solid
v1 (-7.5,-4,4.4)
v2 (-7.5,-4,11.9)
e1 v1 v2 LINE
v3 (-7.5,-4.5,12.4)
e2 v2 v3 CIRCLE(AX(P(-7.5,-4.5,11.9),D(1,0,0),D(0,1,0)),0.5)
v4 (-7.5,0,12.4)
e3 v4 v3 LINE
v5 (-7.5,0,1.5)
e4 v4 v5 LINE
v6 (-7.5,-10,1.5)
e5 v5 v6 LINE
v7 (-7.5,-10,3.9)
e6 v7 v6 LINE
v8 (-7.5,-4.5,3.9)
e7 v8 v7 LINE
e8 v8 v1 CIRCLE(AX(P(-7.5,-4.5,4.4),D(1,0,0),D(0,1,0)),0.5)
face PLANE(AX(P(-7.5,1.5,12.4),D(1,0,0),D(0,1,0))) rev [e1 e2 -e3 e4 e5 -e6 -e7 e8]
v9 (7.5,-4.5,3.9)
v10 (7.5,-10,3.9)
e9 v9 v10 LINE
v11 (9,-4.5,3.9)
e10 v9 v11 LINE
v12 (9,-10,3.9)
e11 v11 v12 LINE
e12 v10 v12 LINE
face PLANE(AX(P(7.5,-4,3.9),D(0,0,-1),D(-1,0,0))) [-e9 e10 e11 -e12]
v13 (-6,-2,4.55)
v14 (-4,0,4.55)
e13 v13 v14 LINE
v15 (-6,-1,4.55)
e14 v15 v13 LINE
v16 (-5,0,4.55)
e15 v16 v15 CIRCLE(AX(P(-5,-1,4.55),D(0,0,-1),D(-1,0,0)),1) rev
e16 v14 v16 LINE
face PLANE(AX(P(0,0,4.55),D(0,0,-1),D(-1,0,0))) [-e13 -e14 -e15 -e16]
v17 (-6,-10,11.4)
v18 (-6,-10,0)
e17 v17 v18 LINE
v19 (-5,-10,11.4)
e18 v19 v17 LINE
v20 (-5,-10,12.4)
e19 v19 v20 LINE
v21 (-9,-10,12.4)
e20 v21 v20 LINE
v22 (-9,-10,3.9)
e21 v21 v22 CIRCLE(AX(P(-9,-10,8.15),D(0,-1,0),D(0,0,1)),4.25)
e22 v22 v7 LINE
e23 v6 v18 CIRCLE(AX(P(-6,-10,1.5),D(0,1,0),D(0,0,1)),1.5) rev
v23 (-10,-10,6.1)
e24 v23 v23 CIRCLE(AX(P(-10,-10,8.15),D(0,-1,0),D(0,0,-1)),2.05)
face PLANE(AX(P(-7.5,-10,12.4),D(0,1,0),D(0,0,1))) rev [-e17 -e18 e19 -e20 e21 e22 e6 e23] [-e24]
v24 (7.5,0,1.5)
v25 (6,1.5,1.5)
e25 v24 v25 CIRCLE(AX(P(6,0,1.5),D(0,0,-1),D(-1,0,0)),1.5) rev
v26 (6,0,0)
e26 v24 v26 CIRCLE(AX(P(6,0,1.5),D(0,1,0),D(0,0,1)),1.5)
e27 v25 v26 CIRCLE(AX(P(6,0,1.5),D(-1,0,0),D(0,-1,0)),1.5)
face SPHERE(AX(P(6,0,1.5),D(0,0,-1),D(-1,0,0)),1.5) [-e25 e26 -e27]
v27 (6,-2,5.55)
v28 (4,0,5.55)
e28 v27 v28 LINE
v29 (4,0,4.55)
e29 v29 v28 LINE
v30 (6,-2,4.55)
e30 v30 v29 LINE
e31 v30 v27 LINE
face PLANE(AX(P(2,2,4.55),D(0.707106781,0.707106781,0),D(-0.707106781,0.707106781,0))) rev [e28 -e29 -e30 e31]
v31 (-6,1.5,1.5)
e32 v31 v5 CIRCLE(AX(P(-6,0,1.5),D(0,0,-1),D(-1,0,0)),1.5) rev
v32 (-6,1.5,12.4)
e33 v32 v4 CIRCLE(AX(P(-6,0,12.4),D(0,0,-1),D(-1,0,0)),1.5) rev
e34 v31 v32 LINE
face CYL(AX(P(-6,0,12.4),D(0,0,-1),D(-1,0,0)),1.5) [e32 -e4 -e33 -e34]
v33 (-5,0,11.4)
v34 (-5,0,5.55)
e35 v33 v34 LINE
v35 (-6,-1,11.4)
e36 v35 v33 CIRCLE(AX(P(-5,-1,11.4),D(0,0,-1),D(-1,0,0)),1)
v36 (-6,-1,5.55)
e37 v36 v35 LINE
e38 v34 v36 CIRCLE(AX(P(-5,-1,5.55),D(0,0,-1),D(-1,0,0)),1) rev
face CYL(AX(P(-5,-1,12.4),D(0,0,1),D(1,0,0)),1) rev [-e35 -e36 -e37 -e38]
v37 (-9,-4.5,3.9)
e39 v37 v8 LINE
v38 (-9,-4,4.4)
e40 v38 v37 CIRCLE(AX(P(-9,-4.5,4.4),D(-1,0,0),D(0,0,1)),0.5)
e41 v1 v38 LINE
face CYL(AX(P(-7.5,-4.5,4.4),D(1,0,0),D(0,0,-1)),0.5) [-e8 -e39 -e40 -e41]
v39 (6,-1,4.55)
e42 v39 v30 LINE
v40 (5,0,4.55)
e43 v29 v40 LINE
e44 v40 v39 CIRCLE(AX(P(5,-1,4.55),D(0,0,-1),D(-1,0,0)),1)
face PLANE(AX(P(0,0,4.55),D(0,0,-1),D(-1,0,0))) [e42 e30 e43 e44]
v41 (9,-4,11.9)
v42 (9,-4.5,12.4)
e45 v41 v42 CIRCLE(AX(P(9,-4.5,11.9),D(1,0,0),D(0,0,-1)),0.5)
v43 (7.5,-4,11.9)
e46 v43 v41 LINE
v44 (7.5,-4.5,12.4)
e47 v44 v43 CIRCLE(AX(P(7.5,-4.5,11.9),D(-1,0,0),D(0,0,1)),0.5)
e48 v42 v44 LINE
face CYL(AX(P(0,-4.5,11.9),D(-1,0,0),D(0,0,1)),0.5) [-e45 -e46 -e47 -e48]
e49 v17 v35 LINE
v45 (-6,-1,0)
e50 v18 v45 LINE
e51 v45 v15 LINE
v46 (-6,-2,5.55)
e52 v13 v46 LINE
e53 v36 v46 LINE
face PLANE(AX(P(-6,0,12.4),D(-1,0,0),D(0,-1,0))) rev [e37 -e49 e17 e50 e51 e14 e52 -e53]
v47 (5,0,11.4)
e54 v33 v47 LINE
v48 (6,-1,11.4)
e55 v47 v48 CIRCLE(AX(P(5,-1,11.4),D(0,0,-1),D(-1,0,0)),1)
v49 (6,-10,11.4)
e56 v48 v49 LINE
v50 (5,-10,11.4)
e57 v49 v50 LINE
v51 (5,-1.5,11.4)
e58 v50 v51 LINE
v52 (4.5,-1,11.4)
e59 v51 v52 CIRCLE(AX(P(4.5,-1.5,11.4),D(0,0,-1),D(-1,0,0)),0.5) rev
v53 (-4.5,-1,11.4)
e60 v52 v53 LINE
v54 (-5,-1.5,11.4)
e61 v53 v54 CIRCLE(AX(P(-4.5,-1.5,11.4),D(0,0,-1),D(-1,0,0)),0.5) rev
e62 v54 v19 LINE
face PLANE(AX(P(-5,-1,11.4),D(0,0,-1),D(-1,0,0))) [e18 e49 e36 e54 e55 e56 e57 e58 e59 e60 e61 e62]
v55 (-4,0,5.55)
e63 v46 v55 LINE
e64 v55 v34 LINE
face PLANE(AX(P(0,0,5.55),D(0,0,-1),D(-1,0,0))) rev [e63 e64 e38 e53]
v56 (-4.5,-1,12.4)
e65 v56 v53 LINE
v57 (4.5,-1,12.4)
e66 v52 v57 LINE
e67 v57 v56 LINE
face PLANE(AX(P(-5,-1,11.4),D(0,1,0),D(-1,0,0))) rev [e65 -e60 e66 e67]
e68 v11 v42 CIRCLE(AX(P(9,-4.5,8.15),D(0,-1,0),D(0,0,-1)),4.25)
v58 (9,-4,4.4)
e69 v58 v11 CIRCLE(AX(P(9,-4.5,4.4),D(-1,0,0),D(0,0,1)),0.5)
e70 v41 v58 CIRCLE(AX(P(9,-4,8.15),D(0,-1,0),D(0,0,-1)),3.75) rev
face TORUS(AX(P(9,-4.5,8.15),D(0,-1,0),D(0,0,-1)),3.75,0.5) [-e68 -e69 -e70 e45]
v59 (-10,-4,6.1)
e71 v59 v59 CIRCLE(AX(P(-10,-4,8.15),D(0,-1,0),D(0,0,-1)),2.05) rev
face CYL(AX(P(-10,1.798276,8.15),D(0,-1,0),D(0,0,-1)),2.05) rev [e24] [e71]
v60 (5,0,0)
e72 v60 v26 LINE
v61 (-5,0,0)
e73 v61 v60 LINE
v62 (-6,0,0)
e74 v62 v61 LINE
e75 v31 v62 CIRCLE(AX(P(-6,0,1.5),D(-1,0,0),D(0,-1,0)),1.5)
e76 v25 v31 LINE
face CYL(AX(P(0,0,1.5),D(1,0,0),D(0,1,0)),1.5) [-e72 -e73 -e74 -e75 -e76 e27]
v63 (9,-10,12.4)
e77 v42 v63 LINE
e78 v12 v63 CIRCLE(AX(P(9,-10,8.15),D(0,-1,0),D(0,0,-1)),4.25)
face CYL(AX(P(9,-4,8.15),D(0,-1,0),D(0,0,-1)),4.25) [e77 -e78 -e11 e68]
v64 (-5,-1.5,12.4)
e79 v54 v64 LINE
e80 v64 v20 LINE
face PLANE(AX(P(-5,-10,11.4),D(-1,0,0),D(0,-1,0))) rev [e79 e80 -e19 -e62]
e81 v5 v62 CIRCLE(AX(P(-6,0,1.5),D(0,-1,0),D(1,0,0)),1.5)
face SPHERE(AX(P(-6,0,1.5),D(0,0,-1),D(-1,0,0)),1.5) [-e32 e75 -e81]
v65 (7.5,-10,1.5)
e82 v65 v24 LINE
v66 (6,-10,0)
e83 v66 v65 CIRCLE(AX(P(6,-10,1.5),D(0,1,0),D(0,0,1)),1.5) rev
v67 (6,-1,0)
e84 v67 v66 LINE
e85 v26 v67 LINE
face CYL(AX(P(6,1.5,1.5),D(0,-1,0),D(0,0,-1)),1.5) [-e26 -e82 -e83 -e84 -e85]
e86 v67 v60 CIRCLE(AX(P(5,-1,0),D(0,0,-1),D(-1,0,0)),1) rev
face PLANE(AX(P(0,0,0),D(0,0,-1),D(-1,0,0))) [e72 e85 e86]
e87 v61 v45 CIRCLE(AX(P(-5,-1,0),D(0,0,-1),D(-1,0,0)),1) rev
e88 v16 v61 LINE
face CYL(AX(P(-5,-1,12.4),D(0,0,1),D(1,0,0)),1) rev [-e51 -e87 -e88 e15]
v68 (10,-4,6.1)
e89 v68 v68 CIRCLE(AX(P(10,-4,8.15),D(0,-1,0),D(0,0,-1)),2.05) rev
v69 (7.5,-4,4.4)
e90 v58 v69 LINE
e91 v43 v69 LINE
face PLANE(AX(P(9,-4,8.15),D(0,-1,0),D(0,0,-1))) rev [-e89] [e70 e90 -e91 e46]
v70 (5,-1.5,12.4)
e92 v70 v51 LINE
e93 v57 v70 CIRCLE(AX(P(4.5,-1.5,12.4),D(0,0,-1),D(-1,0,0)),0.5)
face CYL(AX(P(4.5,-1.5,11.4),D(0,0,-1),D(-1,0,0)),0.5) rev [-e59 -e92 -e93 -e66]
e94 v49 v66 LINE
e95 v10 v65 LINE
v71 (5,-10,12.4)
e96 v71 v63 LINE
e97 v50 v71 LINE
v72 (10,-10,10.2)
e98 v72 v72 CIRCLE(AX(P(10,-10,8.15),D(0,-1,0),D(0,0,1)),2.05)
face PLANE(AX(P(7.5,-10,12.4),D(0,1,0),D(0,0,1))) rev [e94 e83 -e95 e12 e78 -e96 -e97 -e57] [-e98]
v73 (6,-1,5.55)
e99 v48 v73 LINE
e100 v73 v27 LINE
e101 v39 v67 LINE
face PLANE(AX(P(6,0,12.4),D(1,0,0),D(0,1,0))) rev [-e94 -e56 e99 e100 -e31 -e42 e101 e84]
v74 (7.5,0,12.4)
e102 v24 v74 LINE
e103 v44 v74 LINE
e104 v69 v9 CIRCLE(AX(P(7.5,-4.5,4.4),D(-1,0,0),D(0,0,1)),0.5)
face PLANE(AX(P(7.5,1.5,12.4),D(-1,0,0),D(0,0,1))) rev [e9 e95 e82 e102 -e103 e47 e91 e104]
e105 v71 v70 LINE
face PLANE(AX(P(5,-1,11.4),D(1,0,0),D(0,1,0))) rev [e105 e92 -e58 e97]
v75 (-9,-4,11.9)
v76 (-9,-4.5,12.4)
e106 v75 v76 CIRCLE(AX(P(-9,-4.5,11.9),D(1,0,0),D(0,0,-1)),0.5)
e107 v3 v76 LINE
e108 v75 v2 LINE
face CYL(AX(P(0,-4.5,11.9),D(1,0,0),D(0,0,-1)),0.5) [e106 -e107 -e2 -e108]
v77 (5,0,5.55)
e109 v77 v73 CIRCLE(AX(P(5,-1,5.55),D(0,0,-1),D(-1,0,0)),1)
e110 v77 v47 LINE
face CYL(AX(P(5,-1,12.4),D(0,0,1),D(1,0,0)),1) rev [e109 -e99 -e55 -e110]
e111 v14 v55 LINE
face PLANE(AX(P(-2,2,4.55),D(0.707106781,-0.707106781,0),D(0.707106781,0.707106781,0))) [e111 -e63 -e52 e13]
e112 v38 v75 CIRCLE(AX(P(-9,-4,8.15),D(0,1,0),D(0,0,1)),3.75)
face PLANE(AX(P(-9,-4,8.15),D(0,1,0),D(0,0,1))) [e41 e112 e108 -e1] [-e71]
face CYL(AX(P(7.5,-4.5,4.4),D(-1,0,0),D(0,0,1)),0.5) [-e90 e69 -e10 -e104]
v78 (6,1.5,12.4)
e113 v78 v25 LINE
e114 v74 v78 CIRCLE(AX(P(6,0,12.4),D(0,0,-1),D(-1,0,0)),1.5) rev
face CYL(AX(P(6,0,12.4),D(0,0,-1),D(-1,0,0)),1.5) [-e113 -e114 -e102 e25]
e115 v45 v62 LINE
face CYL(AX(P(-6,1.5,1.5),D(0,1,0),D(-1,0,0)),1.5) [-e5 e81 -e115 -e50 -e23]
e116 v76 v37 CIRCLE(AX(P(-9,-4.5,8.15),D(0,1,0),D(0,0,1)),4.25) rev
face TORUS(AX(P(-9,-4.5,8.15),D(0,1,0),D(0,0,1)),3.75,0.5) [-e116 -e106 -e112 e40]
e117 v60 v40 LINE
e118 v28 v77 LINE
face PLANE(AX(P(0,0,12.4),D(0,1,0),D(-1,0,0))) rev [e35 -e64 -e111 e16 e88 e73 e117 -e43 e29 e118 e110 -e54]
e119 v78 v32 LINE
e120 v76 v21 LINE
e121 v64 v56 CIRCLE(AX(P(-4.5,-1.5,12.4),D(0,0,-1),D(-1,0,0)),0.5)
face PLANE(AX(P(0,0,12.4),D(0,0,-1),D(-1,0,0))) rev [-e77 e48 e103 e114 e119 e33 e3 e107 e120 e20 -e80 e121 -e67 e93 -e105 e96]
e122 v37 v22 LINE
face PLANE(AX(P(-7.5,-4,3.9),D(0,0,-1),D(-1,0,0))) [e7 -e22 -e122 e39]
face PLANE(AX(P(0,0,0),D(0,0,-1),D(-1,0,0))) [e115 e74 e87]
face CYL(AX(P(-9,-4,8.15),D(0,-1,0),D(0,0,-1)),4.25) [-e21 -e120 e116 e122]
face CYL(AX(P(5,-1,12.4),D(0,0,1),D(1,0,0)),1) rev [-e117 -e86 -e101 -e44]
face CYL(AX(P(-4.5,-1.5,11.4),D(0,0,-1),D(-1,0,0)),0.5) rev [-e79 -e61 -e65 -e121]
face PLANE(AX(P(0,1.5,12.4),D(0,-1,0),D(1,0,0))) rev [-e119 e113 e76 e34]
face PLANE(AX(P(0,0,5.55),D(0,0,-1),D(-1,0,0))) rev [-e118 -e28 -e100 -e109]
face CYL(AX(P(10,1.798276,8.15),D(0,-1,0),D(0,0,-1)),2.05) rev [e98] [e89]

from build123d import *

# Parameters (mm, degrees)
BOSS_EXTRUDE1_DEPTH = 12.4
BOSS_EXTRUDE2_DEPTH = 6
SKETCH4_R           = 2.05
CUT_EXTRUDE1_DEPTH  = 6
FILLET1_R           = 1.5
FILLET2_R           = 0.5
FILLET3_R           = 1
BOSS_EXTRUDE3_DEPTH = 1
FILLET4_R           = 0.5
BOSS_EXTRUDE4_DEPTH = 1
FILLET5_R           = 1.5


with BuildPart() as part:
    # Sketch1 → Boss-Extrude1 (new body)
    with BuildSketch(Plane.XY):
        Polygon((0, 0), (6, 0), (6, -10), (7.5, -10), (7.5, 1.5), (0, 1.5), (-7.5, 1.5), (-7.5, -10), (-6, -10), (-6, 0), align=None)
    extrude(amount=BOSS_EXTRUDE1_DEPTH)

    # Sketch3 → Boss-Extrude2 (add)
    with BuildSketch(Plane.XZ.offset(10)):
        with BuildLine():
            Line((7.5, 3.9), (7.5, 12.4))
            Line((7.5, 12.4), (9, 12.4))
            ThreePointArc((9, 12.4), (13.25, 8.15), (9, 3.9))
            Line((9, 3.9), (7.5, 3.9))
        make_face()
        with BuildLine():
            Line((-7.5, 12.4), (-9, 12.4))
            ThreePointArc((-9, 12.4), (-13.25, 8.15), (-9, 3.9))
            Line((-9, 3.9), (-7.5, 3.9))
            Line((-7.5, 3.9), (-7.5, 12.4))
        make_face()
    extrude(amount=-BOSS_EXTRUDE2_DEPTH)

    # Sketch4 → Cut-Extrude1 (cut)
    with BuildSketch(Plane.XZ.offset(10)):
        with Locations(Location((-10, 8.15, 0), (0, 0, 270))):
            Circle(SKETCH4_R)
        with Locations(Location((10, 8.15, 0), (0, 0, 270))):
            Circle(SKETCH4_R)
    extrude(amount=-CUT_EXTRUDE1_DEPTH, mode=Mode.SUBTRACT)

    # Fillet1
    fillet1_edges = [part.edges().sort_by_distance(p)[0] for p in [
        (-7.5, 1.5, 6.2),
        (7.5, 1.5, 6.2),
    ]]
    fillet(fillet1_edges, radius=FILLET1_R)

    # Fillet2
    fillet2_edges = [part.edges().sort_by_distance(p)[0] for p in [
        (8.25, -4, 3.9),
        (8.25, -4, 12.4),
        (13.25, -4, 8.15),
        (-13.25, -4, 8.15),
        (-8.25, -4, 12.4),
        (-8.25, -4, 3.9),
    ]]
    fillet(fillet2_edges, radius=FILLET2_R)

    # Fillet3
    fillet3_edges = [part.edges().sort_by_distance(p)[0] for p in [
        (6, 0, 6.2),
        (-6, 0, 6.2),
    ]]
    fillet(fillet3_edges, radius=FILLET3_R)

    # Sketch6 → Boss-Extrude3 (add)
    with BuildSketch(Plane(origin=(0, 0, 12.4), x_dir=(-1, 0, 0), z_dir=(0, 0, -1))):
        with BuildLine():
            Line((6, -10), (6, -1))
            ThreePointArc((6, -1), (5.707106781, -0.292893219), (5, 0))
            Line((5, 0), (-5, 0))
            ThreePointArc((-5, 0), (-5.707106781, -0.292893219), (-6, -1))
            Line((-6, -1), (-6, -10))
            Line((-6, -10), (-5, -10))
            Line((-5, -10), (-5, -1))
            Line((-5, -1), (5, -1))
            Line((5, -1), (5, -10))
            Line((5, -10), (6, -10))
        make_face()
    extrude(amount=BOSS_EXTRUDE3_DEPTH)

    # Fillet4
    fillet4_edges = [part.edges().sort_by_distance(p)[0] for p in [
        (5, -1, 11.9),
        (-5, -1, 11.9),
    ]]
    fillet(fillet4_edges, radius=FILLET4_R)

    # Sketch7 → Boss-Extrude4 (add)
    with BuildSketch(Plane(origin=(0, 0, 5.55), x_dir=(-1, 0, 0), z_dir=(0, 0, -1))):
        with BuildLine():
            Line((-4, 0), (-5, 0))
            ThreePointArc((-5, 0), (-5.707106781, -0.292893219), (-6, -1))
            Line((-6, -1), (-6, -2))
            Line((-6, -2), (-4, 0))
        make_face()
        with BuildLine():
            ThreePointArc((5, 0), (5.707106781, -0.292893219), (6, -1))
            Line((6, -1), (6, -2))
            Line((6, -2), (4, 0))
            Line((4, 0), (5, 0))
        make_face()
    extrude(amount=BOSS_EXTRUDE4_DEPTH)

    # Fillet5
    fillet5_edges = [part.edges().sort_by_distance(p)[0] for p in [
        (-7.5, -5, 0),
        (-7.060660172, 1.060660172, 0),
        (0, 1.5, 0),
        (7.060660172, 1.060660172, 0),
        (7.5, -5, 0),
    ]]
    fillet(fillet5_edges, radius=FILLET5_R - 0.0001)  # a hair under: the kernel refuses the full size


solid = part.part
